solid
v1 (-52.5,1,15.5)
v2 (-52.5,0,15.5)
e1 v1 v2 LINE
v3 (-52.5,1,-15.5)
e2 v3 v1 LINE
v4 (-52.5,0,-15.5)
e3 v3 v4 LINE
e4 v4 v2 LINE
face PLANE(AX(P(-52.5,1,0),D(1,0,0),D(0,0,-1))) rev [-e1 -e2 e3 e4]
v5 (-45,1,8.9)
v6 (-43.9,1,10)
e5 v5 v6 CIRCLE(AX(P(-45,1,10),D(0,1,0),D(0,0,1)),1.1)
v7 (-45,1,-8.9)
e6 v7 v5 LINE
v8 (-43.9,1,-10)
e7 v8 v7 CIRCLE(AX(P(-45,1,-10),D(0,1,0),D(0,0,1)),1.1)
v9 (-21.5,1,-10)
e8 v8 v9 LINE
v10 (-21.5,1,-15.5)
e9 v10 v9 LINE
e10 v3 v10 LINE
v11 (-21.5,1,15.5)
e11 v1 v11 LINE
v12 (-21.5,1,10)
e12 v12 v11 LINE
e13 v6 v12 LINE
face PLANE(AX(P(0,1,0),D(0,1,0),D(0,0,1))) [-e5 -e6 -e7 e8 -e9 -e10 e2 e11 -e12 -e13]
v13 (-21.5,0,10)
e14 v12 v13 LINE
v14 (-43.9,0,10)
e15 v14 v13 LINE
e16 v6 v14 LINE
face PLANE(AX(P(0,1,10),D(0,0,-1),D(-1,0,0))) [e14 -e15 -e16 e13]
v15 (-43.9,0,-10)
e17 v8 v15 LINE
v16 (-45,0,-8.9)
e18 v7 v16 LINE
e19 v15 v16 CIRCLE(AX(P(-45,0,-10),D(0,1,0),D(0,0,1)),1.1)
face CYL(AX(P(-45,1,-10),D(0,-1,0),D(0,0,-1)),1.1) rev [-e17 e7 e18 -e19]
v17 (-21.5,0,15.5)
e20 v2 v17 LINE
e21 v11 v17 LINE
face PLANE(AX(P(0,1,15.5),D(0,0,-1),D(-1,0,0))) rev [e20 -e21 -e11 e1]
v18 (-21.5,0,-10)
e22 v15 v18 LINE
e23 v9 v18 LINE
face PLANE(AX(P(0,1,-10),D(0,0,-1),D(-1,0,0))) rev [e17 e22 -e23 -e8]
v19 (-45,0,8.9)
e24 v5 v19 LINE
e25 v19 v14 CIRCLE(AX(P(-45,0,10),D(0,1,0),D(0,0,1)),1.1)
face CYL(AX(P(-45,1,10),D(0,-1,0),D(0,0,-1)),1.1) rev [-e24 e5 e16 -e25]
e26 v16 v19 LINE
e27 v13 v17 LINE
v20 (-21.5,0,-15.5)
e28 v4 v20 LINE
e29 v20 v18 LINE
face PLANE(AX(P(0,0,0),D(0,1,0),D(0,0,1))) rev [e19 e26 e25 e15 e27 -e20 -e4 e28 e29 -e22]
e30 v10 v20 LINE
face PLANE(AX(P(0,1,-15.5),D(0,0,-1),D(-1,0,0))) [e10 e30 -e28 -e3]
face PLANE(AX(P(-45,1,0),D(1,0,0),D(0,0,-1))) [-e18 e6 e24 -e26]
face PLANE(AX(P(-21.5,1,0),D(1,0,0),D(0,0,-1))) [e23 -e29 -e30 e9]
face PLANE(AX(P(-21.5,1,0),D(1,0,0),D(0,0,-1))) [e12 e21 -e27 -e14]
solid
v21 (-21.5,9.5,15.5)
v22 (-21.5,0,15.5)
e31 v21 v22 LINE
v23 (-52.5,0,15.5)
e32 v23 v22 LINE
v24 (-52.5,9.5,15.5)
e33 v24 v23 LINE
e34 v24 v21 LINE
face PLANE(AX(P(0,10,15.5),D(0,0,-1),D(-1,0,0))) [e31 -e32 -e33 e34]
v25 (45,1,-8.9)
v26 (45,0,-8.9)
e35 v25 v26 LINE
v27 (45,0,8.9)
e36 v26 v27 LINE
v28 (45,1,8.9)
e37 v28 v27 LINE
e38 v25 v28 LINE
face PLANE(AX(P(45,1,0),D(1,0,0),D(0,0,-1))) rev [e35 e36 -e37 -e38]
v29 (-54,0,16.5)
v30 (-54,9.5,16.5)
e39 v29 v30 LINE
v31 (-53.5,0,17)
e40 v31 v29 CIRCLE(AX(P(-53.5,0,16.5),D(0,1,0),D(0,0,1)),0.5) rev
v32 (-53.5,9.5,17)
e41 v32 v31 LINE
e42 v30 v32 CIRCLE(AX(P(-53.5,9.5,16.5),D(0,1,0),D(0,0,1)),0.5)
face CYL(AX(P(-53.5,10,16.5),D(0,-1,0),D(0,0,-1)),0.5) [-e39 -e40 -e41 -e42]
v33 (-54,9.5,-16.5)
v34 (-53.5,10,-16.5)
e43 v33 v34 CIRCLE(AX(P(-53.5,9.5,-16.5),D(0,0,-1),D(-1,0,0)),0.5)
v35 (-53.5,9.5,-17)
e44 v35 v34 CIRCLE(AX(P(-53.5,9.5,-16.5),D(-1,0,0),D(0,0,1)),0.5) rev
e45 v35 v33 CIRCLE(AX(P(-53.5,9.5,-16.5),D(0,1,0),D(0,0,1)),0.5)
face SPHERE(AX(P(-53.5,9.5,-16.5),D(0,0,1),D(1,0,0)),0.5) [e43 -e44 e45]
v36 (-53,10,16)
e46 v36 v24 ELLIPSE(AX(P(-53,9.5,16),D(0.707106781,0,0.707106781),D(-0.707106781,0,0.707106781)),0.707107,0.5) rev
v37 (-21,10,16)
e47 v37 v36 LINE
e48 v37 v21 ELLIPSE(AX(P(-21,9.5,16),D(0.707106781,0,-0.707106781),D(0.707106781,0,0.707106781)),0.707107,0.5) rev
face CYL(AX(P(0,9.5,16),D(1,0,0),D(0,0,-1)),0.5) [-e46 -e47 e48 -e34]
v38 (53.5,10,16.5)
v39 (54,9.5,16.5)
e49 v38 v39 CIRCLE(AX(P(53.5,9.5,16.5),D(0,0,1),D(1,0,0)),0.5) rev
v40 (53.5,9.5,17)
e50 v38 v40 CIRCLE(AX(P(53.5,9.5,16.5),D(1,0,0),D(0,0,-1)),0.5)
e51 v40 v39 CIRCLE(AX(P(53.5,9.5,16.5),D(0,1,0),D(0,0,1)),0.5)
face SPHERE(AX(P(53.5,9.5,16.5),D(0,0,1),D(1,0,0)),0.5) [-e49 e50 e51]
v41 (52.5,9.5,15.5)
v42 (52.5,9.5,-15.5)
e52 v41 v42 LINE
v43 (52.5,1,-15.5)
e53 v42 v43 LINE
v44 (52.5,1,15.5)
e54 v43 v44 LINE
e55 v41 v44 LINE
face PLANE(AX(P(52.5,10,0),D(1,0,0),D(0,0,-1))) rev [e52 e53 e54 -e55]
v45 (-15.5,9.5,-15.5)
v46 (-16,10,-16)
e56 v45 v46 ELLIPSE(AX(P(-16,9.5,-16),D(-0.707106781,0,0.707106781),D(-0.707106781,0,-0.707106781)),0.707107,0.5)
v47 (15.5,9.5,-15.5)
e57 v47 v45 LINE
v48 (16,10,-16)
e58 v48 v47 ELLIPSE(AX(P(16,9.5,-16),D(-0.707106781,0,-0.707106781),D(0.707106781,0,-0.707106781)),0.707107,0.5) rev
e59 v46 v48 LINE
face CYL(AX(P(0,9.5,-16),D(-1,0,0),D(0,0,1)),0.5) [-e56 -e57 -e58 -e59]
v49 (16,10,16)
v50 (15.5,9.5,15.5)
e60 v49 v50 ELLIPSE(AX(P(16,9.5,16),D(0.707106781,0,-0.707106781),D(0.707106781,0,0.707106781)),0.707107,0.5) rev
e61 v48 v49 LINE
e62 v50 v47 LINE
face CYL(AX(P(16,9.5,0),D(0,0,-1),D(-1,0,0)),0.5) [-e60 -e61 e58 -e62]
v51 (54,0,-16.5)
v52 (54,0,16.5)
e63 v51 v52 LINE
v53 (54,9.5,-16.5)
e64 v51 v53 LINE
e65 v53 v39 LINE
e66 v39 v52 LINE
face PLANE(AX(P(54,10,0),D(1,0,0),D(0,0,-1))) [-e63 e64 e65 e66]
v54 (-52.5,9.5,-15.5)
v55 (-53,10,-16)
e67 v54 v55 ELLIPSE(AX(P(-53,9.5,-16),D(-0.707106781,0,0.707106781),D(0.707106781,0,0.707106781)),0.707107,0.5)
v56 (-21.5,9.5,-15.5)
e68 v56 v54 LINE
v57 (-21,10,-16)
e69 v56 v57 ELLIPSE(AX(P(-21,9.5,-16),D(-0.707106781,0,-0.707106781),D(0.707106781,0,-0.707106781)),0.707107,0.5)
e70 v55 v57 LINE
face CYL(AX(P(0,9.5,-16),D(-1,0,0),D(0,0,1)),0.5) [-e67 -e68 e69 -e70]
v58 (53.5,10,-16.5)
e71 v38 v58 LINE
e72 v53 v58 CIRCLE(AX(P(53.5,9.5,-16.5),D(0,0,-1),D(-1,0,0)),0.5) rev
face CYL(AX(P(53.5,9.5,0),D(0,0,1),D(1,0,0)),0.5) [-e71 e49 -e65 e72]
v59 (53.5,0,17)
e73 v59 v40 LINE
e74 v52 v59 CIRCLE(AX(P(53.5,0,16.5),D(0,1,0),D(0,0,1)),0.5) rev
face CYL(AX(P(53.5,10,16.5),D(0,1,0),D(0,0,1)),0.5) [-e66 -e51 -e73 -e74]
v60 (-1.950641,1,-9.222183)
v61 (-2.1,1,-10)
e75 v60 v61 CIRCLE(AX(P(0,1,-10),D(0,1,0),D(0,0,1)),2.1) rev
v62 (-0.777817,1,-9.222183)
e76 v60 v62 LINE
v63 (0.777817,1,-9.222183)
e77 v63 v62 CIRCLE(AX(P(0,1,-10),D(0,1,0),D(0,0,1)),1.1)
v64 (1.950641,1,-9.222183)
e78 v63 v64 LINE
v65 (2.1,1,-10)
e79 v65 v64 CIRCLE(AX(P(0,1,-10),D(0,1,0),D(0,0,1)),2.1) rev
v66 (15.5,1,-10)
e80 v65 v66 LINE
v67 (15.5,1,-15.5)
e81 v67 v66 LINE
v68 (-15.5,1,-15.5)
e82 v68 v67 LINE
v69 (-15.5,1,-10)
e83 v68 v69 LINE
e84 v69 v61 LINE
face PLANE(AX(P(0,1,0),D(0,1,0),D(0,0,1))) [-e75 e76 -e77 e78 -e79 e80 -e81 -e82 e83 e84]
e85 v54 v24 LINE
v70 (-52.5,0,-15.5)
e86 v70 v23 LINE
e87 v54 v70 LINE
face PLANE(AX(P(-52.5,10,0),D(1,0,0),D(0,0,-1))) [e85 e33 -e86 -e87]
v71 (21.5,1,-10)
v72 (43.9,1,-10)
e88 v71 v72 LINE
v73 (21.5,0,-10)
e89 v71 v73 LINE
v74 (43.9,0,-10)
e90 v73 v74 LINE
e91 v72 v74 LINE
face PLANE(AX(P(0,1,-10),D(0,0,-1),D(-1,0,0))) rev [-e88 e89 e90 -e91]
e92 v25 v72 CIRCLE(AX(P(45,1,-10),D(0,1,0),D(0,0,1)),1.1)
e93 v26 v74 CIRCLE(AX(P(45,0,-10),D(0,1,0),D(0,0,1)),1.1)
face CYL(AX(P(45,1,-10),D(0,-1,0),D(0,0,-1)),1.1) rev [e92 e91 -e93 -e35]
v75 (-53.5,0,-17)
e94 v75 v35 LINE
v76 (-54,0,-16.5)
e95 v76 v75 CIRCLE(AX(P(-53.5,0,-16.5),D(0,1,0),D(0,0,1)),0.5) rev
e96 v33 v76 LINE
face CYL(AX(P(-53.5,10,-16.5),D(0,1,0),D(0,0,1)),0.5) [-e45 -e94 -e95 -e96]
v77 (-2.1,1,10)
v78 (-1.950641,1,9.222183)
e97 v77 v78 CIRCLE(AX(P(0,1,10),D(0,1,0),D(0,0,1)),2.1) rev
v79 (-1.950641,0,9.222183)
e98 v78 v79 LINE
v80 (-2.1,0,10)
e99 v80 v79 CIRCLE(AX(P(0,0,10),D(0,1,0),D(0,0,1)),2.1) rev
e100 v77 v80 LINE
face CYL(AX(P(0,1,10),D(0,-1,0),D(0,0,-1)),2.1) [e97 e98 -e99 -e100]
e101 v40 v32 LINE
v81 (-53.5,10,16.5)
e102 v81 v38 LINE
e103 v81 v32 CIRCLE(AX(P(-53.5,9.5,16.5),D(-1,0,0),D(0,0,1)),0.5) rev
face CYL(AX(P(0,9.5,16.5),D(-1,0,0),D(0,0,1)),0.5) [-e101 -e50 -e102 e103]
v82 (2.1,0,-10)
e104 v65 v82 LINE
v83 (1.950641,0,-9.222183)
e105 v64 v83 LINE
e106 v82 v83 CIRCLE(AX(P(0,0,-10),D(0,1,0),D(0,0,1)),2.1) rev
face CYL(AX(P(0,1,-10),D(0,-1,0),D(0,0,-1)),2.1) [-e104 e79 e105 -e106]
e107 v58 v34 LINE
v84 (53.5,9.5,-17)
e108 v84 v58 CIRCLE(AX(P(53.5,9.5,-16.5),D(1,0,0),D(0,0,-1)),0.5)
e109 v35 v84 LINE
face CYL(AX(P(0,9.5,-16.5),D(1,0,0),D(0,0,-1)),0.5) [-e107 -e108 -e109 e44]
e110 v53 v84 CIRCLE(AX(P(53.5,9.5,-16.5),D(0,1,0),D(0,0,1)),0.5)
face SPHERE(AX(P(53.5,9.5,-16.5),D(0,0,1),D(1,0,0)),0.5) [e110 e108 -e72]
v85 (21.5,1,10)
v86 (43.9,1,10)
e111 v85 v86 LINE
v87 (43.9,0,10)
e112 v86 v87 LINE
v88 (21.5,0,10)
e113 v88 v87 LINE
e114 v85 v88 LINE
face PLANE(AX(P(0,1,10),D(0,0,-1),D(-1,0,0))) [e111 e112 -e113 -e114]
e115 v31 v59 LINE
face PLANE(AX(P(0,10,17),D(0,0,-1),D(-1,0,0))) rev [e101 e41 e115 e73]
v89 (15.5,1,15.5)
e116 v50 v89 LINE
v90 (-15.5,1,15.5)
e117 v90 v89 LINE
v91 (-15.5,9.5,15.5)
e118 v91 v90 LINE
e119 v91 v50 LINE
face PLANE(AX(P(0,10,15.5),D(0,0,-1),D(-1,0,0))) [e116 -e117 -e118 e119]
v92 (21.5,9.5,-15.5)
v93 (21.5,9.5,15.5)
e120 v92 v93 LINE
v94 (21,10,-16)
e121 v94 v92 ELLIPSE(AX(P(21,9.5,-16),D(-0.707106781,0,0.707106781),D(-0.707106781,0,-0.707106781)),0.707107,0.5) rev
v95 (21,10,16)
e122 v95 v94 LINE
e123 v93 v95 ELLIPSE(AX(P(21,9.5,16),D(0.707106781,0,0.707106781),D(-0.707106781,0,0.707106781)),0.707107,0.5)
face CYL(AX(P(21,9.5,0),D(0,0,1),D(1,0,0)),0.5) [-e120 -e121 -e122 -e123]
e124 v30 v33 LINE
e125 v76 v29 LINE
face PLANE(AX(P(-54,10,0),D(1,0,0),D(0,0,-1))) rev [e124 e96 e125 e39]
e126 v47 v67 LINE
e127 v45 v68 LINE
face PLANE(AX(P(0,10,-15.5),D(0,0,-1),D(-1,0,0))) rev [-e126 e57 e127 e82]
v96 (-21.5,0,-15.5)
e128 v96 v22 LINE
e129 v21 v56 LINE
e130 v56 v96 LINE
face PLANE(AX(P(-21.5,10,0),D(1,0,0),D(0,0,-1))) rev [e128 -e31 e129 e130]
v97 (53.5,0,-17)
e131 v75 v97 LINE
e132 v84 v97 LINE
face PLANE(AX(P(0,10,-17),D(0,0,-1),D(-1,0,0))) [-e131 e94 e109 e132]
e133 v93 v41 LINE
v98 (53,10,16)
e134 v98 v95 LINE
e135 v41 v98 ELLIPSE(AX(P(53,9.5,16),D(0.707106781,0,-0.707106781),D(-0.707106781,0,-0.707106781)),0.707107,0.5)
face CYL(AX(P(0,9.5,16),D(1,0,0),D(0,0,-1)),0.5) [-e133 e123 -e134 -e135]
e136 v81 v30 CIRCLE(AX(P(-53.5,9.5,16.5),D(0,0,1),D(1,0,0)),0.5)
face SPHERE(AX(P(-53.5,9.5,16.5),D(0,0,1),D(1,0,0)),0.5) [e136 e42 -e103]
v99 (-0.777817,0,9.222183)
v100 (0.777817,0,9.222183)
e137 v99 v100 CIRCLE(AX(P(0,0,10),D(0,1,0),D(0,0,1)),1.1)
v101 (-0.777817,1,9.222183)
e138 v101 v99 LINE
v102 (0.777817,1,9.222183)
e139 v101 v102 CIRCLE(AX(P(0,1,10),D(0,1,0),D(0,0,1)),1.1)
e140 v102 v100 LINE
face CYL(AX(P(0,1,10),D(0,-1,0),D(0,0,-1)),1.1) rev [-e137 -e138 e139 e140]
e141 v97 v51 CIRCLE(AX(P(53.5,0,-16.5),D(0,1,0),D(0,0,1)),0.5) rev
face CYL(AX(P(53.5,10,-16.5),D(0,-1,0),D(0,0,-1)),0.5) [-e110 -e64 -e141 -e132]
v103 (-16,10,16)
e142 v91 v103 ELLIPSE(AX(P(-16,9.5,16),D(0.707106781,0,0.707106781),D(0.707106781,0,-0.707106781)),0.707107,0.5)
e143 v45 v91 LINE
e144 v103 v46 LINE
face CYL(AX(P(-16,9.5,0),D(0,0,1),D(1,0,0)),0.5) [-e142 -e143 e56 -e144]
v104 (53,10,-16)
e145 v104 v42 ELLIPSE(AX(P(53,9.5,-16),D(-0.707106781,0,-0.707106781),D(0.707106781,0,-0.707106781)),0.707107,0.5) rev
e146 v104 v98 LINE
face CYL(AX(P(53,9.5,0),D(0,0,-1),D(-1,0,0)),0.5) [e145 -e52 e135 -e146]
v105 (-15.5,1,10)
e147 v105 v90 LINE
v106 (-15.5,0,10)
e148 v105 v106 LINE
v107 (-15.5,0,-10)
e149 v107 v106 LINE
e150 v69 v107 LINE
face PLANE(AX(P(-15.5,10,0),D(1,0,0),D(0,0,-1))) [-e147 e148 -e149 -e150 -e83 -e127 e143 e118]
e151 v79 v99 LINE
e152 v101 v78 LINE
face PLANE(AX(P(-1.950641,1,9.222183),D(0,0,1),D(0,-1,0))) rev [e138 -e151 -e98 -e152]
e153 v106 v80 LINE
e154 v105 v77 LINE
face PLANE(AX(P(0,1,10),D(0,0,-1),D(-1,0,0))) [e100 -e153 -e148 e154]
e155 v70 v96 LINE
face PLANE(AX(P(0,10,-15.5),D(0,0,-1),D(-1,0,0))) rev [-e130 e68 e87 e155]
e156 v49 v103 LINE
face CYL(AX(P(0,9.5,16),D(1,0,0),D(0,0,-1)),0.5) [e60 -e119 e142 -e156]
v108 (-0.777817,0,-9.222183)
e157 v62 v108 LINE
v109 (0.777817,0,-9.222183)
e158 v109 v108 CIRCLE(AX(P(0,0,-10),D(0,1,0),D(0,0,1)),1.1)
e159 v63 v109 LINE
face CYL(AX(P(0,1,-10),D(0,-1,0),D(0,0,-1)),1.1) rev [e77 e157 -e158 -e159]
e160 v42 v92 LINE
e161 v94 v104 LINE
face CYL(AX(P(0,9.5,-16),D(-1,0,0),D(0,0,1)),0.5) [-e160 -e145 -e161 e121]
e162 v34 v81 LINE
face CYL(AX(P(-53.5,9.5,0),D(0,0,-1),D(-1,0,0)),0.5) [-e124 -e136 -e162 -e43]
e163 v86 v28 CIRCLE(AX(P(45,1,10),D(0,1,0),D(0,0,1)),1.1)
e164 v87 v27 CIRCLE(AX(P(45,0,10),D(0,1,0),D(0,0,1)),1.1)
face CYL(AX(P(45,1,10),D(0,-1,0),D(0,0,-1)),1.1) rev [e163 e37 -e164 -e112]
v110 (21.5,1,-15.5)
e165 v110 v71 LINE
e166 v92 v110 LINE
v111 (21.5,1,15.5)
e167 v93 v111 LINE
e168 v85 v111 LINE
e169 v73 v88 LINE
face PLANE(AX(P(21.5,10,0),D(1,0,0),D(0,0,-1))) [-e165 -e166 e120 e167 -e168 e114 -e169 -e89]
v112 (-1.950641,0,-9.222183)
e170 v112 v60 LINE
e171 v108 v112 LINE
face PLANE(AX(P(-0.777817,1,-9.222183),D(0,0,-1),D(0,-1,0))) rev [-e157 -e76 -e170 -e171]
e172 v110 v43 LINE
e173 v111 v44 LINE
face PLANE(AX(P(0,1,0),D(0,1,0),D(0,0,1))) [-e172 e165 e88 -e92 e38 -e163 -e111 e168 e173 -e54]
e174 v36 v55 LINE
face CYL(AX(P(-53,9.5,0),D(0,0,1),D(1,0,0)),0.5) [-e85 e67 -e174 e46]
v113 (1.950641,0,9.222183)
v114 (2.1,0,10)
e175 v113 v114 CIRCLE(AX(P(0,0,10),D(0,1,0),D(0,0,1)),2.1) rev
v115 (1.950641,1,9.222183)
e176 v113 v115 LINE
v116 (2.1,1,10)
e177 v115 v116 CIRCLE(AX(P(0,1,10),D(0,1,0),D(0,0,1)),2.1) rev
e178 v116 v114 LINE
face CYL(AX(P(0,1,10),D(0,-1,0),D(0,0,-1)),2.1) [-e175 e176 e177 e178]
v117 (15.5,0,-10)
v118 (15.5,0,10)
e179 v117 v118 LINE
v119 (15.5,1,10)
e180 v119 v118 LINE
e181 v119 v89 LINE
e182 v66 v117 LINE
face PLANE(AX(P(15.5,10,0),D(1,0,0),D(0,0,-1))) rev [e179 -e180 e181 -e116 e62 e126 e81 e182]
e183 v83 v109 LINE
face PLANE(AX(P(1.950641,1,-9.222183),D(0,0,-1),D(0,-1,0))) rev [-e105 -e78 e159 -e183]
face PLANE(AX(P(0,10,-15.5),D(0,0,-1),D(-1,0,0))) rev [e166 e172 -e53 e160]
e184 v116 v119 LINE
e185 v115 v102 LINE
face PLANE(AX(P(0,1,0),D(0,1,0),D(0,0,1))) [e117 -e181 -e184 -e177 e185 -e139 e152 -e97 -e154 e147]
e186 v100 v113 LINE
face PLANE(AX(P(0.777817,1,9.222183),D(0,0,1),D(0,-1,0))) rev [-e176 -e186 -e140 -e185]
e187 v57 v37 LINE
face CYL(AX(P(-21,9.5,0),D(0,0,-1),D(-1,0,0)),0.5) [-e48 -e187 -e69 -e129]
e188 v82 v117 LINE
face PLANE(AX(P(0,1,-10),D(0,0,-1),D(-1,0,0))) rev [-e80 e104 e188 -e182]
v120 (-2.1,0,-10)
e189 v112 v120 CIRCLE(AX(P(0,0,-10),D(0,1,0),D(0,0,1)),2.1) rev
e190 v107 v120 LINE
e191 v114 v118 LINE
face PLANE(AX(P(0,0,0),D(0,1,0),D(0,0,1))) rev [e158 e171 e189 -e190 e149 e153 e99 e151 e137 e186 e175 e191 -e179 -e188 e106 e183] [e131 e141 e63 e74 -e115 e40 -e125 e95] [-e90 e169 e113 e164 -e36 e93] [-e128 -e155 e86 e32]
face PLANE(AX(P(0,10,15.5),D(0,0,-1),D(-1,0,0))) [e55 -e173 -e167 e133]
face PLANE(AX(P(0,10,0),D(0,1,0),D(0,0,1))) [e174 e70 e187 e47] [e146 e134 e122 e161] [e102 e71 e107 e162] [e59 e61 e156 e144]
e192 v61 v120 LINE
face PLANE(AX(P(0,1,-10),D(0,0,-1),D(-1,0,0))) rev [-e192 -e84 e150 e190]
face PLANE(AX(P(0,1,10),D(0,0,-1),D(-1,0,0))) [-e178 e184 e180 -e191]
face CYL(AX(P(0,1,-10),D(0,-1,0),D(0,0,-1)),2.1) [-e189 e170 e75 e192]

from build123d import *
from build123d.topology import SkipClean

# Parameters (mm, degrees)
EXTRUDE_1_DEPTH   = 1
EXTRUDE_1_2_DEPTH = 1
EXTRUDE_1_3_DEPTH = 1
EXTRUDE_1_4_DEPTH = 1
SKETCH_1_3_W      = 108
SKETCH_1_3_H      = 34
SKETCH_1_3_W_2    = 105
SKETCH_1_3_H_2    = 31
SKETCH_1_3_W_3    = 6
SKETCH_1_3_H_3    = 20
SKETCH_1_3_H_4    = 5.5
EXTRUDE_2_DEPTH   = 10
FILLET_1_R        = 0.5
FILLET_2_R        = 0.5
EXTRUDE_3_DEPTH   = 1
CHAMFER_1_SIZE    = 1


with BuildPart() as part:
    # 草图1 → 凸台-拉伸1 (new body)
    with BuildSketch(Plane(origin=(0, 0, 0), x_dir=(1, 0, 0), z_dir=(0, 1, 0))):
        with BuildLine():
            Line((-21.5, 10), (-21.5, 15.5))
            Line((-21.5, 15.5), (-52.5, 15.5))
            Line((-52.5, 15.5), (-52.5, -15.5))
            Line((-52.5, -15.5), (-21.5, -15.5))
            Line((-21.5, -15.5), (-21.5, -10))
            Line((-21.5, -10), (-43.9, -10))
            ThreePointArc((-43.9, -10), (-45.777817459, -10.777817459), (-45, -8.9))
            Line((-45, -8.9), (-45, 8.9))
            ThreePointArc((-45, 8.9), (-45.777817459, 10.777817459), (-43.9, 10))
            Line((-43.9, 10), (-21.5, 10))
        make_face()
    extrude(amount=EXTRUDE_1_DEPTH)


with BuildPart() as body_2:
    # 草图1 → Extrude 1 2 (new body)
    with BuildSketch(Plane(origin=(0, 0, 0), x_dir=(1, 0, 0), z_dir=(0, 1, 0))):
        with BuildLine():
            Line((-1.1, -10), (-15.5, -10))
            Line((-15.5, -10), (-15.5, -15.5))
            Line((-15.5, -15.5), (15.5, -15.5))
            Line((15.5, -15.5), (15.5, -10))
            Line((15.5, -10), (1.1, -10))
            ThreePointArc((1.1, -10), (0, -11.1), (-1.1, -10))
        make_face()
    extrude(amount=EXTRUDE_1_2_DEPTH)


with BuildPart() as body_3:
    # 草图1 → Extrude 1 3 (new body)
    with BuildSketch(Plane(origin=(0, 0, 0), x_dir=(1, 0, 0), z_dir=(0, 1, 0))):
        with BuildLine():
            Line((15.5, 15.5), (-15.5, 15.5))
            Line((-15.5, 15.5), (-15.5, 10))
            Line((-15.5, 10), (-1.1, 10))
            ThreePointArc((-1.1, 10), (0, 11.1), (1.1, 10))
            Line((1.1, 10), (15.5, 10))
            Line((15.5, 10), (15.5, 15.5))
        make_face()
    extrude(amount=EXTRUDE_1_3_DEPTH)


with BuildPart() as body_4:
    # 草图1 → Extrude 1 4 (new body)
    with BuildSketch(Plane(origin=(0, 0, 0), x_dir=(1, 0, 0), z_dir=(0, 1, 0))):
        with BuildLine():
            Line((52.5, 15.5), (21.5, 15.5))
            Line((21.5, 15.5), (21.5, 10))
            Line((21.5, 10), (43.9, 10))
            ThreePointArc((43.9, 10), (45, 11.1), (46.1, 10))
            ThreePointArc((46.1, 10), (45.777817459, 9.222182541), (45, 8.9))
            Line((45, 8.9), (45, -8.9))
            ThreePointArc((45, -8.9), (45.777817459, -9.222182541), (46.1, -10))
            ThreePointArc((46.1, -10), (45, -11.1), (43.9, -10))
            Line((43.9, -10), (21.5, -10))
            Line((21.5, -10), (21.5, -15.5))
            Line((21.5, -15.5), (52.5, -15.5))
            Line((52.5, -15.5), (52.5, 15.5))
        make_face()
    extrude(amount=EXTRUDE_1_4_DEPTH)

    # 草图1<3> → 凸台-拉伸2 (add)
    # profile 1 of 7: a face of its own
    with BuildSketch(Plane(origin=(0, 0, 0), x_dir=(1, 0, 0), z_dir=(0, 1, 0))):
        Rectangle(SKETCH_1_3_W, SKETCH_1_3_H)
        Rectangle(SKETCH_1_3_W_2, SKETCH_1_3_H_2, mode=Mode.SUBTRACT)
    # profile 2 of 7: a face of its own
    with BuildSketch(Plane(origin=(0, 0, 0), x_dir=(1, 0, 0), z_dir=(0, 1, 0))):
        with Locations((-18.5, 0)):
            Rectangle(SKETCH_1_3_W_3, SKETCH_1_3_H_3)
    # profile 3 of 7: a face of its own
    with BuildSketch(Plane(origin=(0, 0, 0), x_dir=(1, 0, 0), z_dir=(0, 1, 0))):
        with Locations((18.5, 0)):
            Rectangle(SKETCH_1_3_W_3, SKETCH_1_3_H_3)
    # profile 4 of 7: a face of its own
    with BuildSketch(Plane(origin=(0, 0, 0), x_dir=(1, 0, 0), z_dir=(0, 1, 0))):
        with Locations((-18.5, 12.75)):
            Rectangle(SKETCH_1_3_W_3, SKETCH_1_3_H_4)
    # profile 5 of 7: a face of its own
    with BuildSketch(Plane(origin=(0, 0, 0), x_dir=(1, 0, 0), z_dir=(0, 1, 0))):
        with Locations((-18.5, -12.75)):
            Rectangle(SKETCH_1_3_W_3, SKETCH_1_3_H_4)
    # profile 6 of 7: a face of its own
    with BuildSketch(Plane(origin=(0, 0, 0), x_dir=(1, 0, 0), z_dir=(0, 1, 0))):
        with Locations((18.5, 12.75)):
            Rectangle(SKETCH_1_3_W_3, SKETCH_1_3_H_4)
    # profile 7 of 7: a face of its own
    with BuildSketch(Plane(origin=(0, 0, 0), x_dir=(1, 0, 0), z_dir=(0, 1, 0))):
        with Locations((18.5, -12.75)):
            Rectangle(SKETCH_1_3_W_3, SKETCH_1_3_H_4)
    extrude(amount=EXTRUDE_2_DEPTH)

    # 圆角1
    fillet_1_edges = [body_4.edges().sort_by_distance(p)[0] for p in [
        (0, 10, -17),
        (54, 5, -17),
        (-54, 5, -17),
        (-54, 5, 17),
        (54, 10, 0),
        (54, 5, 17),
        (-54, 10, 0),
        (0, 10, 17),
    ]]
    fillet(fillet_1_edges, radius=FILLET_1_R)

    # 圆角2
    fillet_2_edges = [body_4.edges().sort_by_distance(p)[0] for p in [
        (21.5, 10, 0),
        (-37, 10, 15.5),
        (37, 10, 15.5),
        (-15.5, 10, 0),
        (-52.5, 10, 0),
        (0, 10, 15.5),
        (0, 10, -15.5),
        (15.5, 10, 0),
        (37, 10, -15.5),
        (52.5, 10, 0),
        (-37, 10, -15.5),
        (-21.5, 10, 0),
    ]]
    fillet(fillet_2_edges, radius=FILLET_2_R)


    with SkipClean():  # the faces are left unmerged after this step: merging them gives an invalid solid
        add(body_2.part)  # 凸台-拉伸3 merges body 2

        add(body_3.part)  # 凸台-拉伸3 merges body 3
        # 草图2 → 凸台-拉伸3 (add)
        with BuildSketch(Plane(origin=(0, 0, 0), x_dir=(1, 0, 0), z_dir=(0, 1, 0))):
            with BuildLine():
                ThreePointArc((2.1, 10), (1.940147018, 9.196364792), (1.48492424, 8.51507576))
                Line((1.48492424, 8.51507576), (0.777817459, 9.222182541))
                ThreePointArc((0.777817459, 9.222182541), (1.016267486, 9.579048224), (1.1, 10))
                Line((1.1, 10), (2.1, 10))
            make_face()
            with BuildLine():
                Line((-0.777817459, 9.222182541), (-1.48492424, 8.51507576))
                ThreePointArc((-1.48492424, 8.51507576), (-1.940147018, 9.196364792), (-2.1, 10))
                Line((-2.1, 10), (-1.1, 10))
                ThreePointArc((-1.1, 10), (-1.016267486, 9.579048224), (-0.777817459, 9.222182541))
            make_face()
            with BuildLine():
                Line((0.777817459, -9.222182541), (1.48492424, -8.51507576))
                ThreePointArc((1.48492424, -8.51507576), (1.940147018, -9.196364792), (2.1, -10))
                Line((2.1, -10), (1.1, -10))
                ThreePointArc((1.1, -10), (1.016267486, -9.579048224), (0.777817459, -9.222182541))
            make_face()
            with BuildLine():
                ThreePointArc((-2.1, -10), (-1.940147018, -9.196364792), (-1.48492424, -8.51507576))
                Line((-1.48492424, -8.51507576), (-0.777817459, -9.222182541))
                ThreePointArc((-0.777817459, -9.222182541), (-1.016267486, -9.579048224), (-1.1, -10))
                Line((-1.1, -10), (-2.1, -10))
            make_face()
        extrude(amount=EXTRUDE_3_DEPTH)

    # 倒角1
    # the kernel refuses this chamfer: 1 mm, written as the material it takes off along each edge
    with BuildSketch(Plane(origin=(-1.48492424, -2.571682988, 8.51507576), x_dir=(-0.5500408161449349, 0, 0.8351377734090429), z_dir=(0, 1, 0)), Plane(origin=(1.48492424, -2.571682988, -8.51507576), x_dir=(0.5500408161449349, 0, -0.8351377734090429), z_dir=(0, 1, 0))) as chamfer_1_piece_1:
        with BuildLine():
            Line((0.846694765, 0), (CHAMFER_1_SIZE * 0.201593991777, CHAMFER_1_SIZE * 0.979469173828))
            Line((CHAMFER_1_SIZE * 0.201593991777, CHAMFER_1_SIZE * 0.979469173828), (0, 0))
            ThreePointArc((0, 0), (0.434488163, -0.043085183), (0.846694765, 0))
        make_face()
    extrude(amount=6.143365976, mode=Mode.SUBTRACT)
    with BuildSketch(Plane(origin=(1.48492424, -2.571682988, 8.51507576), x_dir=(0.5500408161449355, 0, 0.8351377734090426), z_dir=(0, 1, 0)), Plane(origin=(-1.48492424, -2.571682988, -8.51507576), x_dir=(-0.5500408161449349, 0, -0.8351377734090429), z_dir=(0, 1, 0))) as chamfer_1_piece_2:
        with BuildLine():
            Line((0.846694765, 0), (CHAMFER_1_SIZE * 0.201593991777, -CHAMFER_1_SIZE * 0.979469173828))
            Line((CHAMFER_1_SIZE * 0.201593991777, -CHAMFER_1_SIZE * 0.979469173828), (0, 0))
            ThreePointArc((0, 0), (0.434488163, 0.043085183), (0.846694765, 0))
        make_face()
    extrude(amount=6.143365976, mode=Mode.SUBTRACT)


solid = Compound([part.part, body_4.part])
